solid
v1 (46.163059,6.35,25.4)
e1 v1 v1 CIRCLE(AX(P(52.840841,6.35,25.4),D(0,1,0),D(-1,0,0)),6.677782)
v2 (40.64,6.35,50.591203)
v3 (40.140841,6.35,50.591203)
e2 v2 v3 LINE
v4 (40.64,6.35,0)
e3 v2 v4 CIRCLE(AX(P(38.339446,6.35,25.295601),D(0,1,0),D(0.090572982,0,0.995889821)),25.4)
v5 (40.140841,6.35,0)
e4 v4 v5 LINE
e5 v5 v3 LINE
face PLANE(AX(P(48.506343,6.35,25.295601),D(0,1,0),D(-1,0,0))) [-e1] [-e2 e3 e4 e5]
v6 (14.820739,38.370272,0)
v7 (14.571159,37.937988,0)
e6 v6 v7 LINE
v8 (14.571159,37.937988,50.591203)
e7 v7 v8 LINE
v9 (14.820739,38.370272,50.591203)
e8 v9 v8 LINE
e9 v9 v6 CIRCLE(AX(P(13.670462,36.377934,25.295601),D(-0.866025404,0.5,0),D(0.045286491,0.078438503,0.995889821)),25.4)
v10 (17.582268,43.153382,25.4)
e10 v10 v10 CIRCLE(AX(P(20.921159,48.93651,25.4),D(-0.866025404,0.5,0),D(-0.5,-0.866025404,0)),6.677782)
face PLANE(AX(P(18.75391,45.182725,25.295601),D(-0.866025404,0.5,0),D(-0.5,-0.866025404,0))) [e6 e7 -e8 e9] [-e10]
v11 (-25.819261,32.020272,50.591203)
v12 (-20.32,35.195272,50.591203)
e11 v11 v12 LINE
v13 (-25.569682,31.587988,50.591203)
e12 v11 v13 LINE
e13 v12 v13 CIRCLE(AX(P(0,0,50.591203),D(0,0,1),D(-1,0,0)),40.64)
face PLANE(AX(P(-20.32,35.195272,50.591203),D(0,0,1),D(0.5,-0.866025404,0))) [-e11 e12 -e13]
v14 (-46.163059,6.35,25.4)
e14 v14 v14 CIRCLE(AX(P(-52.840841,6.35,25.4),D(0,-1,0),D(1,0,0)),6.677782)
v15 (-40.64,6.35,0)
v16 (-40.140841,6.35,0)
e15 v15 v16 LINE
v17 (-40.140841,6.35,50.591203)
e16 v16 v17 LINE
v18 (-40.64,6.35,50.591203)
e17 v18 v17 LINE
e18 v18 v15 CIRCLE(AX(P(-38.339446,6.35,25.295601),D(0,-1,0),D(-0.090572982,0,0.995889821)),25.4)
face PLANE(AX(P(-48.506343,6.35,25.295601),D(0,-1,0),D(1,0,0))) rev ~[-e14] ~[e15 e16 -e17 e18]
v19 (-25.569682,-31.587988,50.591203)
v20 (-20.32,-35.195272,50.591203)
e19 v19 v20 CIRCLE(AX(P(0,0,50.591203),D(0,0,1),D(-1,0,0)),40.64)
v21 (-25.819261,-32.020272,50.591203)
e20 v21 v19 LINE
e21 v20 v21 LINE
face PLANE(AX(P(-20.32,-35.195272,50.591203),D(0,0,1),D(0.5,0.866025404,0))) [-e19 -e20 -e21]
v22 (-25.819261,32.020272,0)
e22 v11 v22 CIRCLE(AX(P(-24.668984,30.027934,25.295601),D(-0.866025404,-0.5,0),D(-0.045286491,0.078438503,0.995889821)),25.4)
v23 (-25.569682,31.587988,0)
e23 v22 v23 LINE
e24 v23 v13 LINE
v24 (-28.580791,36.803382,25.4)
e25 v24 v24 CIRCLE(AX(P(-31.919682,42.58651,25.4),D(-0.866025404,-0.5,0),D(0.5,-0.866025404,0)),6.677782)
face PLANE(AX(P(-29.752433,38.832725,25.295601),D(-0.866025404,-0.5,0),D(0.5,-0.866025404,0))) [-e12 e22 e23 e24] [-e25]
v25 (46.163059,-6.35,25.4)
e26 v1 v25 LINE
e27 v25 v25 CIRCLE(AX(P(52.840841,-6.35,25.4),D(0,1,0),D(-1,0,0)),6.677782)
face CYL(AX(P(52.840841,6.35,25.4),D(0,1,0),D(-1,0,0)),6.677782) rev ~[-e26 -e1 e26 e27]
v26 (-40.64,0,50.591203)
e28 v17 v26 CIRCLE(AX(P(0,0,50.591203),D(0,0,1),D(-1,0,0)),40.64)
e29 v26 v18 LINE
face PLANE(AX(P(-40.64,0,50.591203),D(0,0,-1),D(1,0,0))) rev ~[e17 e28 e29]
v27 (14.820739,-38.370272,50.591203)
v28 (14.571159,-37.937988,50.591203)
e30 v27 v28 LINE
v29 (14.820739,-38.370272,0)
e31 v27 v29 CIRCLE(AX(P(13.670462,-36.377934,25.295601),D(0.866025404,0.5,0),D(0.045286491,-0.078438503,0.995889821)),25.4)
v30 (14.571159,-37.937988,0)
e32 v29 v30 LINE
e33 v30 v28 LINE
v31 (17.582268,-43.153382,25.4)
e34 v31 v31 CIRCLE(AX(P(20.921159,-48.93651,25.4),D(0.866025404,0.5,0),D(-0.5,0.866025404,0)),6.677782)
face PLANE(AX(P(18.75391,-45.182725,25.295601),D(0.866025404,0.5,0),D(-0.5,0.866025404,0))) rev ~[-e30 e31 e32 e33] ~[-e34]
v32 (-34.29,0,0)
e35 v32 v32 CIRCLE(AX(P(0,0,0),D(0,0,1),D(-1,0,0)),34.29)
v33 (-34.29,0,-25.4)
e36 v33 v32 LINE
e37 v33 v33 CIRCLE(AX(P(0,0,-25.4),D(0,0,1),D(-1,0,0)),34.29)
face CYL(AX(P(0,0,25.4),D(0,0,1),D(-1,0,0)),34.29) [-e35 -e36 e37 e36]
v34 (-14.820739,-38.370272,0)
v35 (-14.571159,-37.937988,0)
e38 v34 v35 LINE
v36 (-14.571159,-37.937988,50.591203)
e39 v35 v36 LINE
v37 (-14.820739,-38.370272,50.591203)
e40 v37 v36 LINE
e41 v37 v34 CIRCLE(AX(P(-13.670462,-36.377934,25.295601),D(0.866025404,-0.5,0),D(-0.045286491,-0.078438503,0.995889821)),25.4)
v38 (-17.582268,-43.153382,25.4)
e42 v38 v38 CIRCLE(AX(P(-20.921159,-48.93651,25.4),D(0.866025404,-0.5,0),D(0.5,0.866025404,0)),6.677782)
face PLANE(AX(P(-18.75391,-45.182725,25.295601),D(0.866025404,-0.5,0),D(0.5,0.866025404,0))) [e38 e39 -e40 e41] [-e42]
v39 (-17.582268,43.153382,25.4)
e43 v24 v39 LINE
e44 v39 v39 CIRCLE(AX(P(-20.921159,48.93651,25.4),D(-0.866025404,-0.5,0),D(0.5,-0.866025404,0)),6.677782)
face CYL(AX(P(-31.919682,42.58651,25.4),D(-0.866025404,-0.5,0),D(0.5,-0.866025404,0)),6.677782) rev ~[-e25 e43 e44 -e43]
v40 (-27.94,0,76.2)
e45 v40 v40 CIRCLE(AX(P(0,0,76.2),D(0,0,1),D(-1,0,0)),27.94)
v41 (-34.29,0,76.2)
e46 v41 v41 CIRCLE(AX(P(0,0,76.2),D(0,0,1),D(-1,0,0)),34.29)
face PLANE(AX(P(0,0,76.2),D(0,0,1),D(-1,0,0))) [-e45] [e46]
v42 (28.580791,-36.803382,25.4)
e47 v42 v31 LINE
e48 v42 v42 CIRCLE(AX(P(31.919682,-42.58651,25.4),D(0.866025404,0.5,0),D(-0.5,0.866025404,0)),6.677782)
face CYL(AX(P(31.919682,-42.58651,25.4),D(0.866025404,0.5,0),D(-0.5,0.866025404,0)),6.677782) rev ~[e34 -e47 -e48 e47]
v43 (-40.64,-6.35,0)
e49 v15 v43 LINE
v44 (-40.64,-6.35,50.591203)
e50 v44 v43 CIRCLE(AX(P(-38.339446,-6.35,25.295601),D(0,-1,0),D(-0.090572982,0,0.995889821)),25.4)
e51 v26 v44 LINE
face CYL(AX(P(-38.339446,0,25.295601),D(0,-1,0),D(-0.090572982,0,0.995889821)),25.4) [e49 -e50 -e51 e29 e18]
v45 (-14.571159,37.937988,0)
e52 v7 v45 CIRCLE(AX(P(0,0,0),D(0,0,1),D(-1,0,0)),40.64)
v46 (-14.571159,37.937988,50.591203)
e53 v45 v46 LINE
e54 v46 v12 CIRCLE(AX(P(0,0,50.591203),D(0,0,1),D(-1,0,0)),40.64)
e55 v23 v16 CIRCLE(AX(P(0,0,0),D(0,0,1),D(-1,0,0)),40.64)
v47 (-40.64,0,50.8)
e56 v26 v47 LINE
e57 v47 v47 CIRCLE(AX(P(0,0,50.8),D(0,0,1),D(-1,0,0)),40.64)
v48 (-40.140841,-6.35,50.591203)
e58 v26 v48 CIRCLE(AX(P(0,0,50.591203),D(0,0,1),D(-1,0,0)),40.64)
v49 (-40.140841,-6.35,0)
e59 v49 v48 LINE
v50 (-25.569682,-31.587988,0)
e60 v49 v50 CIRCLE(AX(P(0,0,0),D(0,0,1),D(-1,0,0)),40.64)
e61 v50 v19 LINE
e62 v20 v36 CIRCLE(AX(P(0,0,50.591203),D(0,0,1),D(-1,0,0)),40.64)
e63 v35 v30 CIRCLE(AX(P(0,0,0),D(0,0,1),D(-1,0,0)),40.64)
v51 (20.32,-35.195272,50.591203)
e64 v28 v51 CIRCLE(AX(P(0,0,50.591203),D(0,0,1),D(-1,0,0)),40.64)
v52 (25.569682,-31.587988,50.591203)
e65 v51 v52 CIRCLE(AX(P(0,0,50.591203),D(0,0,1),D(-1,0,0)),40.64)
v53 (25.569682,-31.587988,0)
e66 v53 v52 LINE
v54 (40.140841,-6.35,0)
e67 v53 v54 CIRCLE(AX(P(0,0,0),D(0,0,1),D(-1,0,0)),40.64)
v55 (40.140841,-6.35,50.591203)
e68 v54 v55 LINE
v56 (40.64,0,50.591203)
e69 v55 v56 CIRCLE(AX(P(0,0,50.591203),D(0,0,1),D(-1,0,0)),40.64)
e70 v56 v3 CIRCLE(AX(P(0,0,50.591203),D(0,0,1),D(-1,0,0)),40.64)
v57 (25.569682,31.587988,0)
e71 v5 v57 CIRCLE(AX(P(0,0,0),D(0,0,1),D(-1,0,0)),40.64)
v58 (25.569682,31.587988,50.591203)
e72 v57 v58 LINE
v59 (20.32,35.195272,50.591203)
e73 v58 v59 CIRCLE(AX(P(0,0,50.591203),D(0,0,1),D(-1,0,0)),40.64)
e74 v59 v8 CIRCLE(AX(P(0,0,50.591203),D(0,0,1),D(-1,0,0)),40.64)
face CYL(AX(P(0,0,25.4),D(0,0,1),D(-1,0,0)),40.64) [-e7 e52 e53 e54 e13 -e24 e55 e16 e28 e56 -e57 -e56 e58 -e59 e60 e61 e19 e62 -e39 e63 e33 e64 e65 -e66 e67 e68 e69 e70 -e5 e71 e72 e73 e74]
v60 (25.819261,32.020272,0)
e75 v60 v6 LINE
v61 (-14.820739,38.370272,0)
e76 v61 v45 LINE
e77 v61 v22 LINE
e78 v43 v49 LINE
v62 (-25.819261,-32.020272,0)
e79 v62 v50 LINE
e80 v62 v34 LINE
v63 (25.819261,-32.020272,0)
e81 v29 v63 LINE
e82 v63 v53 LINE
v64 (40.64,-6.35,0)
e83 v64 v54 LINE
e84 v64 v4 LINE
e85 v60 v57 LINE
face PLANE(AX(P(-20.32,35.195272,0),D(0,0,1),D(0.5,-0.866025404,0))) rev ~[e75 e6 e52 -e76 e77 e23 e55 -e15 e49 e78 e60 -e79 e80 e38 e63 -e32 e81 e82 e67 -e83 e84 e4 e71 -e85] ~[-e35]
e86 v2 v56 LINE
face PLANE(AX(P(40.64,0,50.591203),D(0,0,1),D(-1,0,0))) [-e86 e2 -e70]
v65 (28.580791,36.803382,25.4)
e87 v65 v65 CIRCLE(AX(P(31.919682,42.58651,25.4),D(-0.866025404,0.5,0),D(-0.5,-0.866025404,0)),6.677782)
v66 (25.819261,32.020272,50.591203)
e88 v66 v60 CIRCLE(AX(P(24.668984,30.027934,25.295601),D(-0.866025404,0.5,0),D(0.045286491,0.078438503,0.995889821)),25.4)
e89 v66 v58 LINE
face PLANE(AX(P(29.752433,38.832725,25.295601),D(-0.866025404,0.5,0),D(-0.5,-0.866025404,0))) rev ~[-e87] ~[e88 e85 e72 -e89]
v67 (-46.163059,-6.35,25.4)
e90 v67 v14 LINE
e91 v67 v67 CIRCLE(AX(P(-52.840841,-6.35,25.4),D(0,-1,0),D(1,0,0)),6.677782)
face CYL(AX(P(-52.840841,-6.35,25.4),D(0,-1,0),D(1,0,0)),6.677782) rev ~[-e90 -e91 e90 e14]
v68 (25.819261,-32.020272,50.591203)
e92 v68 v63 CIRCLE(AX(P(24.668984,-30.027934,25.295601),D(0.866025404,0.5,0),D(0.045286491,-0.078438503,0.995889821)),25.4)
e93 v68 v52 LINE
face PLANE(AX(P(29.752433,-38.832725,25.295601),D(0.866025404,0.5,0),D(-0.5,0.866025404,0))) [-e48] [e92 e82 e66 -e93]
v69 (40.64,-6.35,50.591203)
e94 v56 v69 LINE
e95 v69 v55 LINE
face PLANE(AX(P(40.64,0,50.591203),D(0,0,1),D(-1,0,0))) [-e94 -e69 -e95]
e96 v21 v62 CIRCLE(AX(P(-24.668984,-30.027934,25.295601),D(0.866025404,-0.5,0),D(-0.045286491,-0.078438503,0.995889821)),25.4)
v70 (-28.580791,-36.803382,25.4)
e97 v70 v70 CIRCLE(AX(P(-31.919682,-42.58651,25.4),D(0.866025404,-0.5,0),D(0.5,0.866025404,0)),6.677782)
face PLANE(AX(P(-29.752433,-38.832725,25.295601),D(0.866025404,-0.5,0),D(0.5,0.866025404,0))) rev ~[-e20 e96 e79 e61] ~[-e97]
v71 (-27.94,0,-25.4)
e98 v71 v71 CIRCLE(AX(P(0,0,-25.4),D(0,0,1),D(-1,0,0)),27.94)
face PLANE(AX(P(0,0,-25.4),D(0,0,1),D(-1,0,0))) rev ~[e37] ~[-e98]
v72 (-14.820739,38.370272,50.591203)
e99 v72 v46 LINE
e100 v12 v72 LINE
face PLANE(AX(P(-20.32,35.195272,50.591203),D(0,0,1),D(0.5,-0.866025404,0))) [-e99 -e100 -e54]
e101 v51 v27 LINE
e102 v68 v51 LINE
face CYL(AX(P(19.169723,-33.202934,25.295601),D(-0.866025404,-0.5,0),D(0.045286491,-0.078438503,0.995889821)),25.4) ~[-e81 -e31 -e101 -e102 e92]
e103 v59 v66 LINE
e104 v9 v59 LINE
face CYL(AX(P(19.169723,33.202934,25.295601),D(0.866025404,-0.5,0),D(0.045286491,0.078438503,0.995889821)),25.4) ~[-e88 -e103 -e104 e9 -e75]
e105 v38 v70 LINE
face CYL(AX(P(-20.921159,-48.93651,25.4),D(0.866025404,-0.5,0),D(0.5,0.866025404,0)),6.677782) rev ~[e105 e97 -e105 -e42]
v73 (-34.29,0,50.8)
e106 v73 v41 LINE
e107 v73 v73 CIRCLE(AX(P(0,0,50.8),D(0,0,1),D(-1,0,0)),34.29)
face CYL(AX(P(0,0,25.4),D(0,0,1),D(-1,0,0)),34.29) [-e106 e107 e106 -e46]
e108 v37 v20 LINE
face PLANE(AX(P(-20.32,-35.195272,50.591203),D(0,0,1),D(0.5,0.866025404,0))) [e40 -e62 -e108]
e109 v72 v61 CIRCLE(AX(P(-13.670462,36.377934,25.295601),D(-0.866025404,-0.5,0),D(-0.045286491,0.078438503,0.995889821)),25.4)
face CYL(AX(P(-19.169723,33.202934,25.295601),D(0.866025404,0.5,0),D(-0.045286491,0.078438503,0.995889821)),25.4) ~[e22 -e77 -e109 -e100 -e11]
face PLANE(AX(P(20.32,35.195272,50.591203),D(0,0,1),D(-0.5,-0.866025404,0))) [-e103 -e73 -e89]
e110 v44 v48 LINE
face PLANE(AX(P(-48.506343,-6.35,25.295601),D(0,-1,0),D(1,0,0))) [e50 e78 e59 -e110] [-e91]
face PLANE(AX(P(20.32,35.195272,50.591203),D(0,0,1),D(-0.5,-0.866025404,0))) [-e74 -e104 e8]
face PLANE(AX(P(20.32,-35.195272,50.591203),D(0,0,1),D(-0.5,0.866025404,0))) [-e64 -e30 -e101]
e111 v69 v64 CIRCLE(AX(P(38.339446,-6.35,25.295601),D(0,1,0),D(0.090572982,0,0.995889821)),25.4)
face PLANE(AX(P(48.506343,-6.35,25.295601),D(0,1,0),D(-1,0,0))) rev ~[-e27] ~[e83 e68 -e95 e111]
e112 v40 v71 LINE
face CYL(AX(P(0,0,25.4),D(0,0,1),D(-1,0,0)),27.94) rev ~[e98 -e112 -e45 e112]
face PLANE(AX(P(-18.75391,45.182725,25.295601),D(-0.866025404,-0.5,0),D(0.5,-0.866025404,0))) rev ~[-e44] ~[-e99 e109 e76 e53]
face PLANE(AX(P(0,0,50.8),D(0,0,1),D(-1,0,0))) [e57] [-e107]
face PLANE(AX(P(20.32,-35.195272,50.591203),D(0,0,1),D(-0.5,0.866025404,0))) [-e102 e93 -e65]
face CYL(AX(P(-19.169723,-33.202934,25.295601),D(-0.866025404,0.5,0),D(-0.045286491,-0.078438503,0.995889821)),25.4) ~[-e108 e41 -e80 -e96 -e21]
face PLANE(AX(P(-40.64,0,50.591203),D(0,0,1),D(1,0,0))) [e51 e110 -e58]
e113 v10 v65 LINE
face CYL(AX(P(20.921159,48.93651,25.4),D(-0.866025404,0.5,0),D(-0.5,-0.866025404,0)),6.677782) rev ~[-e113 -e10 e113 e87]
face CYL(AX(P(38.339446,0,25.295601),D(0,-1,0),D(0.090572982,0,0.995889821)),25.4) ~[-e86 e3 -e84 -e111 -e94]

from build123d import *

# Parameters (mm, degrees)
F0_W            = 12.7
F0_H            = 50.8
F2_W            = 5.08
F2_H            = 50.5912028922
F3_DEPTH        = 6.35
F3_DEPTH_BACK   = 6.35
F3_COPIES_COUNT = 6
F4_R            = 6.6777820133
F5_DEPTH        = 25.4
F5_COPIES_COUNT = 6
F7_W            = 6.35
F7_H            = 101.6


# Not quite as in the source:
# - a pattern or mirror of a feature is missing from the dataset's text; its kind, count and spacing are read off the source's solid


with BuildPart() as f1:
    # F0 (on Front) → F1 (revolve)
    with BuildSketch(Plane.XZ):
        with Locations((-34.29, 25.4)):
            Rectangle(F0_W, F0_H)
    revolve(axis=Axis((0, 0, 19.3039998412), (0, 0, 1)))

    # F2 (on Front) → F3 (join, two sides)
    with BuildSketch(Plane.XZ) as f3_sk:
        with BuildLine():
            Line((-40.64, 0), (-40.64, 50.5912028922))
            ThreePointArc((-40.64, 50.5912028922), (-63.7394462668, 25.2956014461), (-40.64, 0))
        make_face()
        with Locations((-38.1, 25.2956014461)):
            Rectangle(F2_W, F2_H)
    f3 = extrude(amount=F3_DEPTH) + extrude(f3_sk.sketch, amount=-F3_DEPTH_BACK)

    # F3_copies: F3 ×6 about axis
    f3_copies_axis = Axis((0, 0, 0), (0, 0, 1))
    for i in range(1, F3_COPIES_COUNT):
        add(f3.rotate(f3_copies_axis, i * 360 / F3_COPIES_COUNT))

    # F4 (on face) → F5 (cut)
    with BuildSketch(Plane.XZ.offset(6.35)):
        with Locations((-52.8408407984, 25.4)):
            Circle(F4_R)
    f5 = extrude(amount=-F5_DEPTH, mode=Mode.SUBTRACT)

    # F5_copies: F5 ×6 about axis
    f5_copies_axis = Axis((0, 0, 0), (0, 0, 1))
    for i in range(1, F5_COPIES_COUNT):
        add(f5.rotate(f5_copies_axis, i * 360 / F5_COPIES_COUNT), mode=Mode.SUBTRACT)

    # F7 (on Front) → F8 (revolve)
    with BuildSketch(Plane.XZ):
        with Locations((-31.115, 25.4)):
            Rectangle(F7_W, F7_H)
    revolve(axis=Axis((0, 0, 73.8201290369), (0, 0, 1)))


solid = f1.part
